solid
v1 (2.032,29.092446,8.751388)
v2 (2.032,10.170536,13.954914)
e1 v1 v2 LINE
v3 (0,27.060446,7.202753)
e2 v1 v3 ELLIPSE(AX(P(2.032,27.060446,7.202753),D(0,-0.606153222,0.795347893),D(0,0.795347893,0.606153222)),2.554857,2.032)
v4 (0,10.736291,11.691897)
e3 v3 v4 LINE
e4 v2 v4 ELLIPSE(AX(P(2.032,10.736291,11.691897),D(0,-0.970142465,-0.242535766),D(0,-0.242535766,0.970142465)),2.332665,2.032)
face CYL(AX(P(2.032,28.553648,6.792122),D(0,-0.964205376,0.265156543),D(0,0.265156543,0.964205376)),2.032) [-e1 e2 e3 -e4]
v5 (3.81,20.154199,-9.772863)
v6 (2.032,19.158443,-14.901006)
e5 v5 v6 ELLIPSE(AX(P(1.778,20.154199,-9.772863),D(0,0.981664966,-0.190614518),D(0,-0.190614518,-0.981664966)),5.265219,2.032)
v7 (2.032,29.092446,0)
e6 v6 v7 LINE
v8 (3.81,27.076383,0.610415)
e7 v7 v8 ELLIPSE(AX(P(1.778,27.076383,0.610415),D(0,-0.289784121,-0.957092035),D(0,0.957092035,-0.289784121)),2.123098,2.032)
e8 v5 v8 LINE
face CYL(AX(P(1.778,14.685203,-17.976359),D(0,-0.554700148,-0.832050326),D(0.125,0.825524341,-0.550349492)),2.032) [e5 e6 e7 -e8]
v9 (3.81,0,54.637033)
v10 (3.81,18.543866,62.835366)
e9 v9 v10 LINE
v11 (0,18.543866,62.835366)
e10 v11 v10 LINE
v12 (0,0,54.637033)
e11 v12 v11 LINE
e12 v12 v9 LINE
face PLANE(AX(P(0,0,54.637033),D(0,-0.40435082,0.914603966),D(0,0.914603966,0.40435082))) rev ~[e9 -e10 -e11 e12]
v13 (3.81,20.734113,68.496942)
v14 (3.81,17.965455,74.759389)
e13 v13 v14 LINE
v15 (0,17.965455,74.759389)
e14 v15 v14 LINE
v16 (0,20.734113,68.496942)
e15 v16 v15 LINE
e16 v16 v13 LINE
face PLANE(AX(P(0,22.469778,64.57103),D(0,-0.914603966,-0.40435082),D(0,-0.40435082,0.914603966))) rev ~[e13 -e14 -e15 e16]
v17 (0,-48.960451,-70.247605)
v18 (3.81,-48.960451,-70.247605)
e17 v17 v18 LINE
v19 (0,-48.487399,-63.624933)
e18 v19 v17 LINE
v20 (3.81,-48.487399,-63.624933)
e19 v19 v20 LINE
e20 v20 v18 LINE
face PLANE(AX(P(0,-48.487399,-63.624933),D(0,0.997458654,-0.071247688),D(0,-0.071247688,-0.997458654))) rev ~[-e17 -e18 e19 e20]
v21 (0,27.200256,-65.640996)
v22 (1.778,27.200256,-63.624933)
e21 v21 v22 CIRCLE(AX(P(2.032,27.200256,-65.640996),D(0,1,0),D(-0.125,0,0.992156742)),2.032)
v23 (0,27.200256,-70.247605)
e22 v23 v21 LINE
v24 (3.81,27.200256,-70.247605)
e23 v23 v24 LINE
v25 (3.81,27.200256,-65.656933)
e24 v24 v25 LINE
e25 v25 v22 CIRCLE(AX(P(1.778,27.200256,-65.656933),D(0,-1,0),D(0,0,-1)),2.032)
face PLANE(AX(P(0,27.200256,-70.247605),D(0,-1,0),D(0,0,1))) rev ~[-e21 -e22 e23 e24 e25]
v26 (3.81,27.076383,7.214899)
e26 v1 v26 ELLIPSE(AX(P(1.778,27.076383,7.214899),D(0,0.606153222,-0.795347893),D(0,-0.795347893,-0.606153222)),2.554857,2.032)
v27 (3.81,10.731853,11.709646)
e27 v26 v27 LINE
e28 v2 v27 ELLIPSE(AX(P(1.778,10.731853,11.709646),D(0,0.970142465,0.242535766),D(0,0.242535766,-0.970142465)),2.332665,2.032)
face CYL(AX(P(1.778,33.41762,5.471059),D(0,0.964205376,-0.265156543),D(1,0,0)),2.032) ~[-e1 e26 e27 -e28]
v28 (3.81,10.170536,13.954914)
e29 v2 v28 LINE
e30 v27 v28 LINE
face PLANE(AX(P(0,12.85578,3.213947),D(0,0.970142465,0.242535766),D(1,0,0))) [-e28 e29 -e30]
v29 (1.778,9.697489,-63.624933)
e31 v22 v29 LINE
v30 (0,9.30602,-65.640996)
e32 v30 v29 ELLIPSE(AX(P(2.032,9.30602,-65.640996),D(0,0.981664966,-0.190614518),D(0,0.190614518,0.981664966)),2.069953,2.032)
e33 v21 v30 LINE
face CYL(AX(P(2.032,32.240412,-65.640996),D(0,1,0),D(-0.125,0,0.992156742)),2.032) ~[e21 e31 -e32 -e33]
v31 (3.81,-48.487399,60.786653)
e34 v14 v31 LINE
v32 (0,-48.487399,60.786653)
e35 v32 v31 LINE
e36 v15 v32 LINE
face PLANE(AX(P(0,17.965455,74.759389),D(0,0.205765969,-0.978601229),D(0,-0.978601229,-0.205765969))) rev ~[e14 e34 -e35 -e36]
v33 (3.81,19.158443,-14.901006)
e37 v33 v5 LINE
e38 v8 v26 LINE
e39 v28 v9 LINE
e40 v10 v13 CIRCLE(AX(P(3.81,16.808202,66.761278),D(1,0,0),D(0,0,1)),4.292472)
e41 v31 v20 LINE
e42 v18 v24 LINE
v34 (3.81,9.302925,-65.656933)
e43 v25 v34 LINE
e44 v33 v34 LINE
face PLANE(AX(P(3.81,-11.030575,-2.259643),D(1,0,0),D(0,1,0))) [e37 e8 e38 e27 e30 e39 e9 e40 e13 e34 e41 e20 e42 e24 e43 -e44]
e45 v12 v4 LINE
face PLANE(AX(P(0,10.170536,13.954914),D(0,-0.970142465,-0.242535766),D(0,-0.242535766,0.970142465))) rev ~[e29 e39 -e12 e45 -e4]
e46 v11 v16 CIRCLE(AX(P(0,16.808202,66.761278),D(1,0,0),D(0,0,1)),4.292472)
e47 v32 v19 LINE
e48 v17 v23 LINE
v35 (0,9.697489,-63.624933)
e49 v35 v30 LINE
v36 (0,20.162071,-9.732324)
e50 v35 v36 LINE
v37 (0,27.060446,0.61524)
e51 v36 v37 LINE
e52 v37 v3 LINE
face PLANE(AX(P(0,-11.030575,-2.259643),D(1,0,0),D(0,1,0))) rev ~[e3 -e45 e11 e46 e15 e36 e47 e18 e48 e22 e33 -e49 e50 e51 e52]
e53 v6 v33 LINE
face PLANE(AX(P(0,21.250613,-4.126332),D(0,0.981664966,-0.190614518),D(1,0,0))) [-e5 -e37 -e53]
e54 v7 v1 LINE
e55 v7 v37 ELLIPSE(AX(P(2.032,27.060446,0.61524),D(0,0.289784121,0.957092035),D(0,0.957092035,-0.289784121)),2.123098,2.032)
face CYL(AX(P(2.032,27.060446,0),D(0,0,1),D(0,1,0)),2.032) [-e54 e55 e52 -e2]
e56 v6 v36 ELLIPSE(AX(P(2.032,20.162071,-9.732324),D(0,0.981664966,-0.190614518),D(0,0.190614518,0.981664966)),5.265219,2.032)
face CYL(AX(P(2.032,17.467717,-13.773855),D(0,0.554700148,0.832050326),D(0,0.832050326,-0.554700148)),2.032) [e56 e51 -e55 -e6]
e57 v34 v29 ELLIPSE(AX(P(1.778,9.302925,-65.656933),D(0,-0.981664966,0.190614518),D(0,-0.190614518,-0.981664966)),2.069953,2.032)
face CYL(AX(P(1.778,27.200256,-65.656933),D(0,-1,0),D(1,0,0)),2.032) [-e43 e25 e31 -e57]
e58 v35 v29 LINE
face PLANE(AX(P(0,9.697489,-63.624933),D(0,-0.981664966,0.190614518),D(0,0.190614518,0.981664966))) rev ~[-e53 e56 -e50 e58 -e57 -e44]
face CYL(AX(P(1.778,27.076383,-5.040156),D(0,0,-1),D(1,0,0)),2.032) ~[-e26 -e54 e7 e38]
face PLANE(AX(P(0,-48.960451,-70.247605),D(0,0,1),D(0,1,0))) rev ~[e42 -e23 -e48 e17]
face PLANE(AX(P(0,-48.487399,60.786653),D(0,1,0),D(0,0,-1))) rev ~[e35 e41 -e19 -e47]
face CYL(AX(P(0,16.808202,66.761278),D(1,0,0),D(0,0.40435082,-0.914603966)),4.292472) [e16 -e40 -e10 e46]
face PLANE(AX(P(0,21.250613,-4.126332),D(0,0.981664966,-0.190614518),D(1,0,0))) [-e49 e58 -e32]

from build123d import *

# Parameters (mm, degrees)
F1_DEPTH     = 3.81
F2_R         = 4.2924717139
F3_R         = 2.032
F4_T4_DEPTH  = 27.583079529
F5_R         = 2.032
F6_T1_DEPTH  = 18.831700203
F6_T6_DEPTH  = 29.7046687957
F6_T11_DEPTH = 27.9890917976


# Not quite as in the source:
# - a fillet or chamfer that OpenCascade refuses, or shapes differently, is made with other operations: its cross-section is extruded or revolved along the edge and cut away or added


with BuildPart() as f1:
    # F0 (on Right) → F1 (new body)
    with BuildSketch(Plane.YZ):
        Polygon((-48.4873987734, 60.7866533101), (-48.4873987734, 33.8229238987), (-48.4873987734, 28.1463507563), (-48.4873987734, -63.624933362), (-48.9604510367, -70.247605443), (27.200255543, -70.247605443), (27.200255543, -63.624933362), (9.6974885091, -63.624933362), (19.158443436, -14.901005663), (29.0924459696, 0), (29.0924459696, 8.7513877079), (10.1705361158, 13.954914175), (0, 54.6370334923), (22.4697776139, 64.5710304379), (17.9654553963, 74.7593885665), align=None)
    extrude(amount=F1_DEPTH)

    # F2
    f2_edges = [f1.edges().sort_by_distance(p)[0] for p in [
        (1.905, 22.469778, 64.57103),
    ]]
    fillet(f2_edges, radius=F2_R)

    # F3
    f3_edges = [f1.edges().sort_by_distance(p)[0] for p in [
        (3.81, 18.448872, -63.624933),
    ]]
    fillet(f3_edges, radius=F3_R)

    # F4: fillet of radius 2.032 on 1 edges, made by hand


with BuildPart() as f4_tool2:
    # F4_s3 → F4_t4 (new body)
    with BuildSketch(Plane.XZ.offset(-32.2404117906)):
        with BuildLine():
            ThreePointArc((1.778, -63.624933362), (0.508, -64.296954195), (0, -65.640995861))
            Line((0, -65.640995861), (0, -63.624933362))
            Line((0, -63.624933362), (1.778, -63.624933362))
        make_face()
    extrude(amount=F4_T4_DEPTH)

    split(bisect_by=Plane(origin=(0, 21.2506127093, -4.1263317328), x_dir=(1, 0, 0), z_dir=(0, 0.981664966, -0.1906145181)), keep=Keep.TOP)


with BuildPart() as f1_1:
    add(f1.part)

    # F4_t1: cut F4_tool2
    add(f4_tool2.part, mode=Mode.SUBTRACT)

    # F5
    f5_edges = [f1_1.edges().sort_by_distance(p)[0] for p in [
        (0, 24.125445, -7.450503),
        (0, 29.092446, 4.375694),
        (0, 19.631491, 11.353151),
    ]]
    fillet(f5_edges, radius=F5_R)

    # F6: fillet of radius 2.032 on 3 edges, made by hand

    # F6_s2 → F6_t1 (cut)
    with BuildSketch(Plane.XY.offset(-5.0401562476)):
        with BuildLine():
            ThreePointArc((3.81, 27.0763834706), (3.302, 28.4204251366), (2.032, 29.0924459696))
            Line((2.032, 29.0924459696), (2.03708, 29.1327672196))
            ThreePointArc((2.03708, 29.1327672196), (2.921, 29.1330859696), (3.81, 29.1330859696))
            Line((3.81, 29.1330859696), (3.85064, 29.0924459696))
            Line((3.85064, 29.0924459696), (3.85064, 27.0763834706))
            Line((3.85064, 27.0763834706), (3.81, 27.0763834706))
        make_face()
    extrude(amount=F6_T1_DEPTH, mode=Mode.SUBTRACT)


with BuildPart() as f6_tool4:
    # F6_s5 → F6_t6 (new body)
    with BuildSketch(Plane(origin=(0, 29.6693335374, -8.1590686942), x_dir=(1, 0, 0), z_dir=(0, -0.9642053764, 0.2651565426))):
        with BuildLine():
            ThreePointArc((3.81, 14.1361249687), (3.302, 15.4801666347), (2.032, 16.1521874677))
            Line((2.032, 16.1521874677), (2.03708, 16.1925087177))
            ThreePointArc((2.03708, 16.1925087177), (2.921, 16.1928274677), (3.81, 16.1928274677))
            Line((3.81, 16.1928274677), (3.85064, 16.1521874677))
            Line((3.85064, 16.1521874677), (3.85064, 14.1361249687))
            Line((3.85064, 14.1361249687), (3.81, 14.1361249687))
        make_face()
    extrude(amount=F6_T6_DEPTH)

    split(bisect_by=Plane(origin=(0, 12.8557795978, 3.213946886), x_dir=(1, 0, 0), z_dir=(0, 0.9701424649, 0.2425357661)), keep=Keep.TOP)


with BuildPart() as f1_2:
    add(f1_1.part)

    # F6_t3: cut F6_tool4
    add(f6_tool4.part, mode=Mode.SUBTRACT)


with BuildPart() as f6_tool9:
    # F6_s10 → F6_t11 (new body)
    with BuildSketch(Plane(origin=(0, -3.7782576637, -5.6673872039), x_dir=(1, 0, 0), z_dir=(0, 0.5547001482, 0.8320503263))):
        with BuildLine():
            ThreePointArc((2.032, 24.206379163), (3.302, 23.53435833), (3.81, 22.190316664))
            Line((3.81, 22.190316664), (3.85064, 22.190316664))
            Line((3.85064, 22.190316664), (3.85064, 24.206379163))
            Line((3.85064, 24.206379163), (3.81, 24.247019163))
            ThreePointArc((3.81, 24.247019163), (2.921, 24.247019163), (2.03708, 24.246700413))
            Line((2.03708, 24.246700413), (2.032, 24.206379163))
        make_face()
    extrude(amount=F6_T11_DEPTH)

    split(bisect_by=Plane(origin=(0, 21.2506127093, -4.1263317328), x_dir=(1, 0, 0), z_dir=(0, 0.981664966, -0.1906145181)), keep=Keep.TOP)


with BuildPart() as f1_3:
    add(f1_2.part)

    # F6_t8: cut F6_tool9
    add(f6_tool9.part, mode=Mode.SUBTRACT)


solid = f1_3.part
